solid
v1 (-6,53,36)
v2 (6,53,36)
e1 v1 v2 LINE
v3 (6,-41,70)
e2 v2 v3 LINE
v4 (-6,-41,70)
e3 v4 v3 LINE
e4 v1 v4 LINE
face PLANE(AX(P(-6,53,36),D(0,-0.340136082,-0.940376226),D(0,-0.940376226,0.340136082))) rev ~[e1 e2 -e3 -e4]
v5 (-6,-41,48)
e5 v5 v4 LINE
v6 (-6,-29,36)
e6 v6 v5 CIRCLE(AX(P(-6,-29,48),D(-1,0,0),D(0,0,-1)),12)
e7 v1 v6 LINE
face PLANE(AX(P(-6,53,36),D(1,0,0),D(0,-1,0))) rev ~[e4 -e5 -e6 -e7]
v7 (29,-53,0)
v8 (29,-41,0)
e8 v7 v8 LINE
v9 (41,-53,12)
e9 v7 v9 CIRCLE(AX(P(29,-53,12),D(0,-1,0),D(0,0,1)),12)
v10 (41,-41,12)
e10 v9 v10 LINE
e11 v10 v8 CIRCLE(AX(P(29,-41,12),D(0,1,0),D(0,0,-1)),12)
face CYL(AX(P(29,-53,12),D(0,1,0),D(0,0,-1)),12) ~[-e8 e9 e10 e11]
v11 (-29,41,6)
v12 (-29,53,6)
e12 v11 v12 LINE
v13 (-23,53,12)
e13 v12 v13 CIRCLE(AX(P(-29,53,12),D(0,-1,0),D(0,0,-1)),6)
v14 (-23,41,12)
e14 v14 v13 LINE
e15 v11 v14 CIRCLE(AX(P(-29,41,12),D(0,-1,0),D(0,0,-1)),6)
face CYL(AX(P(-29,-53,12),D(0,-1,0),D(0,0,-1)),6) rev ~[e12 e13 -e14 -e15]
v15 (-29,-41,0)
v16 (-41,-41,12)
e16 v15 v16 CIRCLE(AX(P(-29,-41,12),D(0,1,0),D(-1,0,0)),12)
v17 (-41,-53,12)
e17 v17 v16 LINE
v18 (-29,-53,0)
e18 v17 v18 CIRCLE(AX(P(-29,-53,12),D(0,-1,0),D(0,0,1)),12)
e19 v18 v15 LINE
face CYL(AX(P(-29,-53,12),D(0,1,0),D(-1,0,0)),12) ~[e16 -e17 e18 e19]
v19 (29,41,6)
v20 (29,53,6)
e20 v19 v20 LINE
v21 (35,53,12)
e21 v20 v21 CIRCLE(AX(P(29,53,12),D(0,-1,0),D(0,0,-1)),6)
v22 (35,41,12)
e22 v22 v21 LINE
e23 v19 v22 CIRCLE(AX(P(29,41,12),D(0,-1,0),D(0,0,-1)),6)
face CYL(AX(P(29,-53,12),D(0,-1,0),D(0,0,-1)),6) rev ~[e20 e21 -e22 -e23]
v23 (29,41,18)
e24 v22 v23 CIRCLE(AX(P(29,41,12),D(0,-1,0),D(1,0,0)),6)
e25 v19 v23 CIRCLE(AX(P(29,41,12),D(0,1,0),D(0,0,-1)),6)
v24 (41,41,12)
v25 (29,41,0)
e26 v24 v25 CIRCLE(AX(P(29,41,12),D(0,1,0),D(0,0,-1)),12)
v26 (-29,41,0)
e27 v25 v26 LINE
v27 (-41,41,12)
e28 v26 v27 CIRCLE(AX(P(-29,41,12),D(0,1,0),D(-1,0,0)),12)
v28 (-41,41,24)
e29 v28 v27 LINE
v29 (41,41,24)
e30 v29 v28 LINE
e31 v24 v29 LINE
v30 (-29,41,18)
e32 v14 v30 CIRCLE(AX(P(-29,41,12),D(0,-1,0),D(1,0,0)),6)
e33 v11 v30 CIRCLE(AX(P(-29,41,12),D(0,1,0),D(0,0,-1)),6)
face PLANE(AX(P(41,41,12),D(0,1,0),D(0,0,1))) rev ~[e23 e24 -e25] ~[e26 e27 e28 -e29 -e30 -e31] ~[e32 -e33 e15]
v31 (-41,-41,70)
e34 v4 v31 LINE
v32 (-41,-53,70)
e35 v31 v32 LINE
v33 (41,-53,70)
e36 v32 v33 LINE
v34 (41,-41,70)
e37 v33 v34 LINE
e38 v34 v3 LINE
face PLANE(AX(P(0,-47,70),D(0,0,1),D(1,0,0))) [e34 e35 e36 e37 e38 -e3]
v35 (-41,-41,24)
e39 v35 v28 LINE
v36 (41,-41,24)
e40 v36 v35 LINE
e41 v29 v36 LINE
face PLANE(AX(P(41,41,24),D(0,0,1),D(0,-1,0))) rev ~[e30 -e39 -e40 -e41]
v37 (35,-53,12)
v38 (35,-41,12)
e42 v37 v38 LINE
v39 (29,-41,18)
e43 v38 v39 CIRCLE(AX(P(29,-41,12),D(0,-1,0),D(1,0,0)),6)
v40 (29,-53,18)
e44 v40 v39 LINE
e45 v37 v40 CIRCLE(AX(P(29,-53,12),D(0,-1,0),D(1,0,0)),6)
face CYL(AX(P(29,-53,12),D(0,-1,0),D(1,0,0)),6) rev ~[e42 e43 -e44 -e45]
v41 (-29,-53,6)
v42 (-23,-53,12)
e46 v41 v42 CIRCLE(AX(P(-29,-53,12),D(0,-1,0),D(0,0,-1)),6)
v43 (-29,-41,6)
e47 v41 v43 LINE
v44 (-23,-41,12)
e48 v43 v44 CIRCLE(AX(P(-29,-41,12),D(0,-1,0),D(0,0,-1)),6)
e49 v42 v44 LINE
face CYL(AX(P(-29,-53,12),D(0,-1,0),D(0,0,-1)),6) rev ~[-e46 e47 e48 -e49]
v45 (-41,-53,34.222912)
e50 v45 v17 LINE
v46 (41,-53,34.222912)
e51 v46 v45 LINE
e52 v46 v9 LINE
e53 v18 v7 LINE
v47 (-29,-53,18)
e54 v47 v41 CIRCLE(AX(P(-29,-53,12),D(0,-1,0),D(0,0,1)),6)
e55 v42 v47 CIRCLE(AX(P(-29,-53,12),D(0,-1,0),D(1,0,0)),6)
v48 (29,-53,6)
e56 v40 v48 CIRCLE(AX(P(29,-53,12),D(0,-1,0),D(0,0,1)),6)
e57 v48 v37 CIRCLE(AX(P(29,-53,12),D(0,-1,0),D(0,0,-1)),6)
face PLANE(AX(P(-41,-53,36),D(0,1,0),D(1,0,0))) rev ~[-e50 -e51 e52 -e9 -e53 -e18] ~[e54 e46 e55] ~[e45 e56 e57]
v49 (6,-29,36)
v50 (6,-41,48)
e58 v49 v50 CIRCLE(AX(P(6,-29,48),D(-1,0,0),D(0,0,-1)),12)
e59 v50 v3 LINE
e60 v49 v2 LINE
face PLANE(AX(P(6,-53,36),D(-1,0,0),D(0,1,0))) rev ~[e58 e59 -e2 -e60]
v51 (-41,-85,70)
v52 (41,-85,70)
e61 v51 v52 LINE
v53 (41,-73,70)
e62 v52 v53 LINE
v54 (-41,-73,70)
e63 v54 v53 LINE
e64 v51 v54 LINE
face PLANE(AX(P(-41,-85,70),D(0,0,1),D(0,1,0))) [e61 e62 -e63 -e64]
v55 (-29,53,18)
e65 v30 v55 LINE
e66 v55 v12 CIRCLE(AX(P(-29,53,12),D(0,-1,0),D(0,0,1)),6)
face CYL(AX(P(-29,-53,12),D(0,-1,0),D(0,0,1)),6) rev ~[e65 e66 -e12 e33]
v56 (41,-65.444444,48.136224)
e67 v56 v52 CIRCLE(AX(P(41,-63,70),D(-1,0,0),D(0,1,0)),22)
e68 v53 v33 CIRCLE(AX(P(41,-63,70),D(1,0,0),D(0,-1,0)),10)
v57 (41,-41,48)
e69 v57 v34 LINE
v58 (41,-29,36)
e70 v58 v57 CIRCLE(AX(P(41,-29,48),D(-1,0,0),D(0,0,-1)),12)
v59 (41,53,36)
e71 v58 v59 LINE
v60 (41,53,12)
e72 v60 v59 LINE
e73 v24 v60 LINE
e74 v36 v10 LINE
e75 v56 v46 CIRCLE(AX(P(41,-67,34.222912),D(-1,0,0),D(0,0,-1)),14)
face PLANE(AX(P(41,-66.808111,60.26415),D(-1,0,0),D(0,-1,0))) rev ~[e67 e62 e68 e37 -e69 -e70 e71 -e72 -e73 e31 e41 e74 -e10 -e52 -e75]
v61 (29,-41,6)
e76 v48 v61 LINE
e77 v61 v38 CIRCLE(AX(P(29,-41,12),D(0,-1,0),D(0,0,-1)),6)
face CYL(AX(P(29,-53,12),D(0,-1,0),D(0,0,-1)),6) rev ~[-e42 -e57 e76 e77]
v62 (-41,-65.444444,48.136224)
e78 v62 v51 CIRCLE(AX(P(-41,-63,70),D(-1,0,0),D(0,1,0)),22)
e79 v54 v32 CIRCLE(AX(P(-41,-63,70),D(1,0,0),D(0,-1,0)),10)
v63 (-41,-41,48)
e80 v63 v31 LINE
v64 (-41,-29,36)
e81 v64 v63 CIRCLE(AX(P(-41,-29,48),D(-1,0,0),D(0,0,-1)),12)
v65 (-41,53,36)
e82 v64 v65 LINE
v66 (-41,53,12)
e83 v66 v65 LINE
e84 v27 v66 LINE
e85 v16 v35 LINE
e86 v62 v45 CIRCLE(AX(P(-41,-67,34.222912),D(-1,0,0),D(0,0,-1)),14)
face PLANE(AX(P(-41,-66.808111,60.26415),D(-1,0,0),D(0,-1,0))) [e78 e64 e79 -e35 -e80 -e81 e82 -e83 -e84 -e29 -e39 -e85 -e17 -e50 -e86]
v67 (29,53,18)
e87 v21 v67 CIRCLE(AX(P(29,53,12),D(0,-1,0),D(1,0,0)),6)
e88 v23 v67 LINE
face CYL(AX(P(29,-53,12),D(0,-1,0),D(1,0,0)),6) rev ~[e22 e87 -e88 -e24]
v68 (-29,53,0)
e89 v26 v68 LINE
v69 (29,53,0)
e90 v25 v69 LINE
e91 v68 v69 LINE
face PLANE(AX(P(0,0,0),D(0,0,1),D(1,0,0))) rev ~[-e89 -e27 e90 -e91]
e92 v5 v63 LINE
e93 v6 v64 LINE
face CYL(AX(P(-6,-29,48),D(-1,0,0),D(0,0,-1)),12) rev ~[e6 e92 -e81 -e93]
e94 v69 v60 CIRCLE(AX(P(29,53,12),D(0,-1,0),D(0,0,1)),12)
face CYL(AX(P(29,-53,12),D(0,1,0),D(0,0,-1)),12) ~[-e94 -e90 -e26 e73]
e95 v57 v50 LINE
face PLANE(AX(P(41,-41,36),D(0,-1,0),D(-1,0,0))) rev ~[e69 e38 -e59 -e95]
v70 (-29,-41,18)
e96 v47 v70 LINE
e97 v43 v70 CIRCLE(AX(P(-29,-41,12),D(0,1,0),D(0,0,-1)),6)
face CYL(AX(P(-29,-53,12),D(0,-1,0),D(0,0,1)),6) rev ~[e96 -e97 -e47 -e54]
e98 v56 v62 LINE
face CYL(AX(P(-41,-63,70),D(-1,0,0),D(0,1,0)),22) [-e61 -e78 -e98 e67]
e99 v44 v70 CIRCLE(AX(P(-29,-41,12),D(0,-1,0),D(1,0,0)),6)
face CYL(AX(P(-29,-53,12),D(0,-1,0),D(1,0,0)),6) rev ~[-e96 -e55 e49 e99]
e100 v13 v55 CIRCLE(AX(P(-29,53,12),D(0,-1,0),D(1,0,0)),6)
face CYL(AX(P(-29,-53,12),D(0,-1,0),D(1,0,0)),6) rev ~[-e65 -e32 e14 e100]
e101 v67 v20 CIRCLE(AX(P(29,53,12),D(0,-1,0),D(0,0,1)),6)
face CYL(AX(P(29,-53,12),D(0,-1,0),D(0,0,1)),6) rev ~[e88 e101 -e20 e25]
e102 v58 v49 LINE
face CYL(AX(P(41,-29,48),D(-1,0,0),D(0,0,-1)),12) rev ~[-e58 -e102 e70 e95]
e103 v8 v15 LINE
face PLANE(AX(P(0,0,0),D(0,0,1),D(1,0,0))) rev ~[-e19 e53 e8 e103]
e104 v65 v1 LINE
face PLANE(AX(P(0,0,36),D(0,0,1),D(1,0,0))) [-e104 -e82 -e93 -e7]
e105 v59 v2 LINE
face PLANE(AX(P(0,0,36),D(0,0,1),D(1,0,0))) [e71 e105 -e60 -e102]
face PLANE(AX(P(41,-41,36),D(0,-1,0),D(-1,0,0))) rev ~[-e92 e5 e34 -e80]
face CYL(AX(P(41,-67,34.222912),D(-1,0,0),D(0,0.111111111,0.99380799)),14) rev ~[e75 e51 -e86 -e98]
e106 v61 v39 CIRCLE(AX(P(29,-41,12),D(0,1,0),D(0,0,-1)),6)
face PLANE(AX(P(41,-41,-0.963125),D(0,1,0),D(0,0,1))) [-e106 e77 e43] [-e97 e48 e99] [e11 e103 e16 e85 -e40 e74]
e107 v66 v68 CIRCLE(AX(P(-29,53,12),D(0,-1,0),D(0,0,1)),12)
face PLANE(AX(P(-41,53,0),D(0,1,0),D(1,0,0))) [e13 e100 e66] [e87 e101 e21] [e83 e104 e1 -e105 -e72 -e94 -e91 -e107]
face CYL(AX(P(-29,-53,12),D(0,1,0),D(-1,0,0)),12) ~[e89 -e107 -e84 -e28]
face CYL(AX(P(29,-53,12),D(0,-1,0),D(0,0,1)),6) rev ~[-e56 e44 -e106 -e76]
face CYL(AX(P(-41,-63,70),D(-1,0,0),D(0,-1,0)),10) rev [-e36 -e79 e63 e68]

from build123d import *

# Parameters (mm, degrees)
F0_W      = 82
F0_H      = 106
F1_DEPTH  = 36
F3_R      = 12
F4_DEPTH  = 191.1
F5_R      = 12
F7_DEPTH  = 174.6
F9_W      = 82
F9_H      = 12.96312543
F10_DEPTH = 116.9
F12_DEPTH = 34
F14_DEPTH = 25
F15_W     = 12
F15_H     = 34
F16_DEPTH = 25
F18_DEPTH = 34
F19_R     = 12
F21_DEPTH = 82
F22_R     = 14


# Not quite as in the source:
# - a feature of the source that left no trace in its solid (it failed there, or was rolled back) is left out


with BuildPart() as f1:
    # F0 (on Top) → F1 (new body)
    with BuildSketch(Plane.XY):
        Rectangle(F0_W, F0_H)
    extrude(amount=F1_DEPTH)

    # F3
    f3_edges = [f1.edges().sort_by_distance(p)[0] for p in [
        (-41, 0, 0),
    ]]
    fillet(f3_edges, radius=F3_R)

    # F2 (on face) → F4 (cut)
    with BuildSketch(Plane.XZ.offset(53)):
        with BuildLine():
            ThreePointArc((-29, 18), (-35, 12), (-29, 6))
            Line((-29, 6), (-29, 12))
            Line((-29, 12), (-29, 18))
        make_face()
        with BuildLine():
            Line((-29, 12), (-29, 6))
            ThreePointArc((-29, 6), (-24.7573593129, 7.7573593129), (-23, 12))
            ThreePointArc((-23, 12), (-24.7573593129, 16.2426406871), (-29, 18))
            Line((-29, 18), (-29, 12))
        make_face()
        with BuildLine():
            Line((29, 12), (29, 6))
            ThreePointArc((29, 6), (33.2426406871, 7.7573593129), (35, 12))
            ThreePointArc((35, 12), (33.2426406871, 16.2426406871), (29, 18))
            Line((29, 18), (29, 12))
        make_face()
        with BuildLine():
            ThreePointArc((29, 18), (23, 12), (29, 6))
            Line((29, 6), (29, 12))
            Line((29, 12), (29, 18))
        make_face()
    extrude(amount=-F4_DEPTH, mode=Mode.SUBTRACT)

    # F5
    f5_edges = [f1.edges().sort_by_distance(p)[0] for p in [
        (41, 0, 0),
    ]]
    fillet(f5_edges, radius=F5_R)

    # F6 (on face) → F7 (cut)
    with BuildSketch(Plane.YZ.offset(41)):
        Polygon((41, 24), (-30.1027745008, 24), (-41, 24), (-41, 12), (41, 12), align=None)
    extrude(amount=-F7_DEPTH, mode=Mode.SUBTRACT)

    # F9 (on face) → F10 (cut)
    with BuildSketch(Plane.YZ.offset(41)):
        with Locations((0, 5.518437285)):
            Rectangle(F9_W, F9_H)
    extrude(amount=-F10_DEPTH, mode=Mode.SUBTRACT)

    # F11 (on face) → F12 (join)
    with BuildSketch(Plane.XY.offset(36)):
        Polygon((0, 53), (-6, 53), (-6, -53), (6, -53), (6, 53), align=None)
    extrude(amount=F12_DEPTH)

    # F13 (on face) → F14 (cut)
    with BuildSketch(Plane(origin=(-6, 0, 0), x_dir=(0, -1, 0), z_dir=(-1, 0, 0))):
        Polygon((-53, 70), (-53, 36), (41, 70), align=None)
    extrude(amount=-F14_DEPTH, mode=Mode.SUBTRACT)

    # F15 (on face) → F16 (cut)
    with BuildSketch(Plane(origin=(-6, 0, 0), x_dir=(0, -1, 0), z_dir=(-1, 0, 0))):
        with Locations((47, 53)):
            Rectangle(F15_W, F15_H)
    extrude(amount=-F16_DEPTH, mode=Mode.SUBTRACT)

    # F17 (on face) → F18 (join)
    with BuildSketch(Plane.XY.offset(36)):
        Polygon((41, -53), (41, -41), (6, -41), (-6, -41), (-41, -41), (-41, -53), align=None)
    extrude(amount=F18_DEPTH)

    # F19
    f19_edges = [f1.edges().sort_by_distance(p)[0] for p in [
        (-23.5, -41, 36),
        (23.5, -41, 36),
    ]]
    fillet(f19_edges, radius=F19_R)

    # F20 (on face) → F21 (join, through all)
    with BuildSketch(Plane(origin=(-41, 0, 0), x_dir=(0, -1, 0), z_dir=(-1, 0, 0))):
        with BuildLine():
            Line((53, 70), (53, 50.4040820577))
            ThreePointArc((53, 50.4040820577), (74.4891252931, 51.2383369607), (85, 70))
            Line((85, 70), (73, 70))
            ThreePointArc((73, 70), (63, 60), (53, 70))
        make_face()
        with BuildLine():
            Line((53, 70), (41, 70))
            ThreePointArc((41, 70), (44.2383369607, 58.5108747069), (53, 50.4040820577))
            Line((53, 50.4040820577), (53, 70))
        make_face()
    extrude(amount=-F21_DEPTH)

    # F22
    f22_edges = [f1.edges().sort_by_distance(p)[0] for p in [
        (0, -53, 50.404082),
    ]]
    fillet(f22_edges, radius=F22_R)


solid = f1.part
